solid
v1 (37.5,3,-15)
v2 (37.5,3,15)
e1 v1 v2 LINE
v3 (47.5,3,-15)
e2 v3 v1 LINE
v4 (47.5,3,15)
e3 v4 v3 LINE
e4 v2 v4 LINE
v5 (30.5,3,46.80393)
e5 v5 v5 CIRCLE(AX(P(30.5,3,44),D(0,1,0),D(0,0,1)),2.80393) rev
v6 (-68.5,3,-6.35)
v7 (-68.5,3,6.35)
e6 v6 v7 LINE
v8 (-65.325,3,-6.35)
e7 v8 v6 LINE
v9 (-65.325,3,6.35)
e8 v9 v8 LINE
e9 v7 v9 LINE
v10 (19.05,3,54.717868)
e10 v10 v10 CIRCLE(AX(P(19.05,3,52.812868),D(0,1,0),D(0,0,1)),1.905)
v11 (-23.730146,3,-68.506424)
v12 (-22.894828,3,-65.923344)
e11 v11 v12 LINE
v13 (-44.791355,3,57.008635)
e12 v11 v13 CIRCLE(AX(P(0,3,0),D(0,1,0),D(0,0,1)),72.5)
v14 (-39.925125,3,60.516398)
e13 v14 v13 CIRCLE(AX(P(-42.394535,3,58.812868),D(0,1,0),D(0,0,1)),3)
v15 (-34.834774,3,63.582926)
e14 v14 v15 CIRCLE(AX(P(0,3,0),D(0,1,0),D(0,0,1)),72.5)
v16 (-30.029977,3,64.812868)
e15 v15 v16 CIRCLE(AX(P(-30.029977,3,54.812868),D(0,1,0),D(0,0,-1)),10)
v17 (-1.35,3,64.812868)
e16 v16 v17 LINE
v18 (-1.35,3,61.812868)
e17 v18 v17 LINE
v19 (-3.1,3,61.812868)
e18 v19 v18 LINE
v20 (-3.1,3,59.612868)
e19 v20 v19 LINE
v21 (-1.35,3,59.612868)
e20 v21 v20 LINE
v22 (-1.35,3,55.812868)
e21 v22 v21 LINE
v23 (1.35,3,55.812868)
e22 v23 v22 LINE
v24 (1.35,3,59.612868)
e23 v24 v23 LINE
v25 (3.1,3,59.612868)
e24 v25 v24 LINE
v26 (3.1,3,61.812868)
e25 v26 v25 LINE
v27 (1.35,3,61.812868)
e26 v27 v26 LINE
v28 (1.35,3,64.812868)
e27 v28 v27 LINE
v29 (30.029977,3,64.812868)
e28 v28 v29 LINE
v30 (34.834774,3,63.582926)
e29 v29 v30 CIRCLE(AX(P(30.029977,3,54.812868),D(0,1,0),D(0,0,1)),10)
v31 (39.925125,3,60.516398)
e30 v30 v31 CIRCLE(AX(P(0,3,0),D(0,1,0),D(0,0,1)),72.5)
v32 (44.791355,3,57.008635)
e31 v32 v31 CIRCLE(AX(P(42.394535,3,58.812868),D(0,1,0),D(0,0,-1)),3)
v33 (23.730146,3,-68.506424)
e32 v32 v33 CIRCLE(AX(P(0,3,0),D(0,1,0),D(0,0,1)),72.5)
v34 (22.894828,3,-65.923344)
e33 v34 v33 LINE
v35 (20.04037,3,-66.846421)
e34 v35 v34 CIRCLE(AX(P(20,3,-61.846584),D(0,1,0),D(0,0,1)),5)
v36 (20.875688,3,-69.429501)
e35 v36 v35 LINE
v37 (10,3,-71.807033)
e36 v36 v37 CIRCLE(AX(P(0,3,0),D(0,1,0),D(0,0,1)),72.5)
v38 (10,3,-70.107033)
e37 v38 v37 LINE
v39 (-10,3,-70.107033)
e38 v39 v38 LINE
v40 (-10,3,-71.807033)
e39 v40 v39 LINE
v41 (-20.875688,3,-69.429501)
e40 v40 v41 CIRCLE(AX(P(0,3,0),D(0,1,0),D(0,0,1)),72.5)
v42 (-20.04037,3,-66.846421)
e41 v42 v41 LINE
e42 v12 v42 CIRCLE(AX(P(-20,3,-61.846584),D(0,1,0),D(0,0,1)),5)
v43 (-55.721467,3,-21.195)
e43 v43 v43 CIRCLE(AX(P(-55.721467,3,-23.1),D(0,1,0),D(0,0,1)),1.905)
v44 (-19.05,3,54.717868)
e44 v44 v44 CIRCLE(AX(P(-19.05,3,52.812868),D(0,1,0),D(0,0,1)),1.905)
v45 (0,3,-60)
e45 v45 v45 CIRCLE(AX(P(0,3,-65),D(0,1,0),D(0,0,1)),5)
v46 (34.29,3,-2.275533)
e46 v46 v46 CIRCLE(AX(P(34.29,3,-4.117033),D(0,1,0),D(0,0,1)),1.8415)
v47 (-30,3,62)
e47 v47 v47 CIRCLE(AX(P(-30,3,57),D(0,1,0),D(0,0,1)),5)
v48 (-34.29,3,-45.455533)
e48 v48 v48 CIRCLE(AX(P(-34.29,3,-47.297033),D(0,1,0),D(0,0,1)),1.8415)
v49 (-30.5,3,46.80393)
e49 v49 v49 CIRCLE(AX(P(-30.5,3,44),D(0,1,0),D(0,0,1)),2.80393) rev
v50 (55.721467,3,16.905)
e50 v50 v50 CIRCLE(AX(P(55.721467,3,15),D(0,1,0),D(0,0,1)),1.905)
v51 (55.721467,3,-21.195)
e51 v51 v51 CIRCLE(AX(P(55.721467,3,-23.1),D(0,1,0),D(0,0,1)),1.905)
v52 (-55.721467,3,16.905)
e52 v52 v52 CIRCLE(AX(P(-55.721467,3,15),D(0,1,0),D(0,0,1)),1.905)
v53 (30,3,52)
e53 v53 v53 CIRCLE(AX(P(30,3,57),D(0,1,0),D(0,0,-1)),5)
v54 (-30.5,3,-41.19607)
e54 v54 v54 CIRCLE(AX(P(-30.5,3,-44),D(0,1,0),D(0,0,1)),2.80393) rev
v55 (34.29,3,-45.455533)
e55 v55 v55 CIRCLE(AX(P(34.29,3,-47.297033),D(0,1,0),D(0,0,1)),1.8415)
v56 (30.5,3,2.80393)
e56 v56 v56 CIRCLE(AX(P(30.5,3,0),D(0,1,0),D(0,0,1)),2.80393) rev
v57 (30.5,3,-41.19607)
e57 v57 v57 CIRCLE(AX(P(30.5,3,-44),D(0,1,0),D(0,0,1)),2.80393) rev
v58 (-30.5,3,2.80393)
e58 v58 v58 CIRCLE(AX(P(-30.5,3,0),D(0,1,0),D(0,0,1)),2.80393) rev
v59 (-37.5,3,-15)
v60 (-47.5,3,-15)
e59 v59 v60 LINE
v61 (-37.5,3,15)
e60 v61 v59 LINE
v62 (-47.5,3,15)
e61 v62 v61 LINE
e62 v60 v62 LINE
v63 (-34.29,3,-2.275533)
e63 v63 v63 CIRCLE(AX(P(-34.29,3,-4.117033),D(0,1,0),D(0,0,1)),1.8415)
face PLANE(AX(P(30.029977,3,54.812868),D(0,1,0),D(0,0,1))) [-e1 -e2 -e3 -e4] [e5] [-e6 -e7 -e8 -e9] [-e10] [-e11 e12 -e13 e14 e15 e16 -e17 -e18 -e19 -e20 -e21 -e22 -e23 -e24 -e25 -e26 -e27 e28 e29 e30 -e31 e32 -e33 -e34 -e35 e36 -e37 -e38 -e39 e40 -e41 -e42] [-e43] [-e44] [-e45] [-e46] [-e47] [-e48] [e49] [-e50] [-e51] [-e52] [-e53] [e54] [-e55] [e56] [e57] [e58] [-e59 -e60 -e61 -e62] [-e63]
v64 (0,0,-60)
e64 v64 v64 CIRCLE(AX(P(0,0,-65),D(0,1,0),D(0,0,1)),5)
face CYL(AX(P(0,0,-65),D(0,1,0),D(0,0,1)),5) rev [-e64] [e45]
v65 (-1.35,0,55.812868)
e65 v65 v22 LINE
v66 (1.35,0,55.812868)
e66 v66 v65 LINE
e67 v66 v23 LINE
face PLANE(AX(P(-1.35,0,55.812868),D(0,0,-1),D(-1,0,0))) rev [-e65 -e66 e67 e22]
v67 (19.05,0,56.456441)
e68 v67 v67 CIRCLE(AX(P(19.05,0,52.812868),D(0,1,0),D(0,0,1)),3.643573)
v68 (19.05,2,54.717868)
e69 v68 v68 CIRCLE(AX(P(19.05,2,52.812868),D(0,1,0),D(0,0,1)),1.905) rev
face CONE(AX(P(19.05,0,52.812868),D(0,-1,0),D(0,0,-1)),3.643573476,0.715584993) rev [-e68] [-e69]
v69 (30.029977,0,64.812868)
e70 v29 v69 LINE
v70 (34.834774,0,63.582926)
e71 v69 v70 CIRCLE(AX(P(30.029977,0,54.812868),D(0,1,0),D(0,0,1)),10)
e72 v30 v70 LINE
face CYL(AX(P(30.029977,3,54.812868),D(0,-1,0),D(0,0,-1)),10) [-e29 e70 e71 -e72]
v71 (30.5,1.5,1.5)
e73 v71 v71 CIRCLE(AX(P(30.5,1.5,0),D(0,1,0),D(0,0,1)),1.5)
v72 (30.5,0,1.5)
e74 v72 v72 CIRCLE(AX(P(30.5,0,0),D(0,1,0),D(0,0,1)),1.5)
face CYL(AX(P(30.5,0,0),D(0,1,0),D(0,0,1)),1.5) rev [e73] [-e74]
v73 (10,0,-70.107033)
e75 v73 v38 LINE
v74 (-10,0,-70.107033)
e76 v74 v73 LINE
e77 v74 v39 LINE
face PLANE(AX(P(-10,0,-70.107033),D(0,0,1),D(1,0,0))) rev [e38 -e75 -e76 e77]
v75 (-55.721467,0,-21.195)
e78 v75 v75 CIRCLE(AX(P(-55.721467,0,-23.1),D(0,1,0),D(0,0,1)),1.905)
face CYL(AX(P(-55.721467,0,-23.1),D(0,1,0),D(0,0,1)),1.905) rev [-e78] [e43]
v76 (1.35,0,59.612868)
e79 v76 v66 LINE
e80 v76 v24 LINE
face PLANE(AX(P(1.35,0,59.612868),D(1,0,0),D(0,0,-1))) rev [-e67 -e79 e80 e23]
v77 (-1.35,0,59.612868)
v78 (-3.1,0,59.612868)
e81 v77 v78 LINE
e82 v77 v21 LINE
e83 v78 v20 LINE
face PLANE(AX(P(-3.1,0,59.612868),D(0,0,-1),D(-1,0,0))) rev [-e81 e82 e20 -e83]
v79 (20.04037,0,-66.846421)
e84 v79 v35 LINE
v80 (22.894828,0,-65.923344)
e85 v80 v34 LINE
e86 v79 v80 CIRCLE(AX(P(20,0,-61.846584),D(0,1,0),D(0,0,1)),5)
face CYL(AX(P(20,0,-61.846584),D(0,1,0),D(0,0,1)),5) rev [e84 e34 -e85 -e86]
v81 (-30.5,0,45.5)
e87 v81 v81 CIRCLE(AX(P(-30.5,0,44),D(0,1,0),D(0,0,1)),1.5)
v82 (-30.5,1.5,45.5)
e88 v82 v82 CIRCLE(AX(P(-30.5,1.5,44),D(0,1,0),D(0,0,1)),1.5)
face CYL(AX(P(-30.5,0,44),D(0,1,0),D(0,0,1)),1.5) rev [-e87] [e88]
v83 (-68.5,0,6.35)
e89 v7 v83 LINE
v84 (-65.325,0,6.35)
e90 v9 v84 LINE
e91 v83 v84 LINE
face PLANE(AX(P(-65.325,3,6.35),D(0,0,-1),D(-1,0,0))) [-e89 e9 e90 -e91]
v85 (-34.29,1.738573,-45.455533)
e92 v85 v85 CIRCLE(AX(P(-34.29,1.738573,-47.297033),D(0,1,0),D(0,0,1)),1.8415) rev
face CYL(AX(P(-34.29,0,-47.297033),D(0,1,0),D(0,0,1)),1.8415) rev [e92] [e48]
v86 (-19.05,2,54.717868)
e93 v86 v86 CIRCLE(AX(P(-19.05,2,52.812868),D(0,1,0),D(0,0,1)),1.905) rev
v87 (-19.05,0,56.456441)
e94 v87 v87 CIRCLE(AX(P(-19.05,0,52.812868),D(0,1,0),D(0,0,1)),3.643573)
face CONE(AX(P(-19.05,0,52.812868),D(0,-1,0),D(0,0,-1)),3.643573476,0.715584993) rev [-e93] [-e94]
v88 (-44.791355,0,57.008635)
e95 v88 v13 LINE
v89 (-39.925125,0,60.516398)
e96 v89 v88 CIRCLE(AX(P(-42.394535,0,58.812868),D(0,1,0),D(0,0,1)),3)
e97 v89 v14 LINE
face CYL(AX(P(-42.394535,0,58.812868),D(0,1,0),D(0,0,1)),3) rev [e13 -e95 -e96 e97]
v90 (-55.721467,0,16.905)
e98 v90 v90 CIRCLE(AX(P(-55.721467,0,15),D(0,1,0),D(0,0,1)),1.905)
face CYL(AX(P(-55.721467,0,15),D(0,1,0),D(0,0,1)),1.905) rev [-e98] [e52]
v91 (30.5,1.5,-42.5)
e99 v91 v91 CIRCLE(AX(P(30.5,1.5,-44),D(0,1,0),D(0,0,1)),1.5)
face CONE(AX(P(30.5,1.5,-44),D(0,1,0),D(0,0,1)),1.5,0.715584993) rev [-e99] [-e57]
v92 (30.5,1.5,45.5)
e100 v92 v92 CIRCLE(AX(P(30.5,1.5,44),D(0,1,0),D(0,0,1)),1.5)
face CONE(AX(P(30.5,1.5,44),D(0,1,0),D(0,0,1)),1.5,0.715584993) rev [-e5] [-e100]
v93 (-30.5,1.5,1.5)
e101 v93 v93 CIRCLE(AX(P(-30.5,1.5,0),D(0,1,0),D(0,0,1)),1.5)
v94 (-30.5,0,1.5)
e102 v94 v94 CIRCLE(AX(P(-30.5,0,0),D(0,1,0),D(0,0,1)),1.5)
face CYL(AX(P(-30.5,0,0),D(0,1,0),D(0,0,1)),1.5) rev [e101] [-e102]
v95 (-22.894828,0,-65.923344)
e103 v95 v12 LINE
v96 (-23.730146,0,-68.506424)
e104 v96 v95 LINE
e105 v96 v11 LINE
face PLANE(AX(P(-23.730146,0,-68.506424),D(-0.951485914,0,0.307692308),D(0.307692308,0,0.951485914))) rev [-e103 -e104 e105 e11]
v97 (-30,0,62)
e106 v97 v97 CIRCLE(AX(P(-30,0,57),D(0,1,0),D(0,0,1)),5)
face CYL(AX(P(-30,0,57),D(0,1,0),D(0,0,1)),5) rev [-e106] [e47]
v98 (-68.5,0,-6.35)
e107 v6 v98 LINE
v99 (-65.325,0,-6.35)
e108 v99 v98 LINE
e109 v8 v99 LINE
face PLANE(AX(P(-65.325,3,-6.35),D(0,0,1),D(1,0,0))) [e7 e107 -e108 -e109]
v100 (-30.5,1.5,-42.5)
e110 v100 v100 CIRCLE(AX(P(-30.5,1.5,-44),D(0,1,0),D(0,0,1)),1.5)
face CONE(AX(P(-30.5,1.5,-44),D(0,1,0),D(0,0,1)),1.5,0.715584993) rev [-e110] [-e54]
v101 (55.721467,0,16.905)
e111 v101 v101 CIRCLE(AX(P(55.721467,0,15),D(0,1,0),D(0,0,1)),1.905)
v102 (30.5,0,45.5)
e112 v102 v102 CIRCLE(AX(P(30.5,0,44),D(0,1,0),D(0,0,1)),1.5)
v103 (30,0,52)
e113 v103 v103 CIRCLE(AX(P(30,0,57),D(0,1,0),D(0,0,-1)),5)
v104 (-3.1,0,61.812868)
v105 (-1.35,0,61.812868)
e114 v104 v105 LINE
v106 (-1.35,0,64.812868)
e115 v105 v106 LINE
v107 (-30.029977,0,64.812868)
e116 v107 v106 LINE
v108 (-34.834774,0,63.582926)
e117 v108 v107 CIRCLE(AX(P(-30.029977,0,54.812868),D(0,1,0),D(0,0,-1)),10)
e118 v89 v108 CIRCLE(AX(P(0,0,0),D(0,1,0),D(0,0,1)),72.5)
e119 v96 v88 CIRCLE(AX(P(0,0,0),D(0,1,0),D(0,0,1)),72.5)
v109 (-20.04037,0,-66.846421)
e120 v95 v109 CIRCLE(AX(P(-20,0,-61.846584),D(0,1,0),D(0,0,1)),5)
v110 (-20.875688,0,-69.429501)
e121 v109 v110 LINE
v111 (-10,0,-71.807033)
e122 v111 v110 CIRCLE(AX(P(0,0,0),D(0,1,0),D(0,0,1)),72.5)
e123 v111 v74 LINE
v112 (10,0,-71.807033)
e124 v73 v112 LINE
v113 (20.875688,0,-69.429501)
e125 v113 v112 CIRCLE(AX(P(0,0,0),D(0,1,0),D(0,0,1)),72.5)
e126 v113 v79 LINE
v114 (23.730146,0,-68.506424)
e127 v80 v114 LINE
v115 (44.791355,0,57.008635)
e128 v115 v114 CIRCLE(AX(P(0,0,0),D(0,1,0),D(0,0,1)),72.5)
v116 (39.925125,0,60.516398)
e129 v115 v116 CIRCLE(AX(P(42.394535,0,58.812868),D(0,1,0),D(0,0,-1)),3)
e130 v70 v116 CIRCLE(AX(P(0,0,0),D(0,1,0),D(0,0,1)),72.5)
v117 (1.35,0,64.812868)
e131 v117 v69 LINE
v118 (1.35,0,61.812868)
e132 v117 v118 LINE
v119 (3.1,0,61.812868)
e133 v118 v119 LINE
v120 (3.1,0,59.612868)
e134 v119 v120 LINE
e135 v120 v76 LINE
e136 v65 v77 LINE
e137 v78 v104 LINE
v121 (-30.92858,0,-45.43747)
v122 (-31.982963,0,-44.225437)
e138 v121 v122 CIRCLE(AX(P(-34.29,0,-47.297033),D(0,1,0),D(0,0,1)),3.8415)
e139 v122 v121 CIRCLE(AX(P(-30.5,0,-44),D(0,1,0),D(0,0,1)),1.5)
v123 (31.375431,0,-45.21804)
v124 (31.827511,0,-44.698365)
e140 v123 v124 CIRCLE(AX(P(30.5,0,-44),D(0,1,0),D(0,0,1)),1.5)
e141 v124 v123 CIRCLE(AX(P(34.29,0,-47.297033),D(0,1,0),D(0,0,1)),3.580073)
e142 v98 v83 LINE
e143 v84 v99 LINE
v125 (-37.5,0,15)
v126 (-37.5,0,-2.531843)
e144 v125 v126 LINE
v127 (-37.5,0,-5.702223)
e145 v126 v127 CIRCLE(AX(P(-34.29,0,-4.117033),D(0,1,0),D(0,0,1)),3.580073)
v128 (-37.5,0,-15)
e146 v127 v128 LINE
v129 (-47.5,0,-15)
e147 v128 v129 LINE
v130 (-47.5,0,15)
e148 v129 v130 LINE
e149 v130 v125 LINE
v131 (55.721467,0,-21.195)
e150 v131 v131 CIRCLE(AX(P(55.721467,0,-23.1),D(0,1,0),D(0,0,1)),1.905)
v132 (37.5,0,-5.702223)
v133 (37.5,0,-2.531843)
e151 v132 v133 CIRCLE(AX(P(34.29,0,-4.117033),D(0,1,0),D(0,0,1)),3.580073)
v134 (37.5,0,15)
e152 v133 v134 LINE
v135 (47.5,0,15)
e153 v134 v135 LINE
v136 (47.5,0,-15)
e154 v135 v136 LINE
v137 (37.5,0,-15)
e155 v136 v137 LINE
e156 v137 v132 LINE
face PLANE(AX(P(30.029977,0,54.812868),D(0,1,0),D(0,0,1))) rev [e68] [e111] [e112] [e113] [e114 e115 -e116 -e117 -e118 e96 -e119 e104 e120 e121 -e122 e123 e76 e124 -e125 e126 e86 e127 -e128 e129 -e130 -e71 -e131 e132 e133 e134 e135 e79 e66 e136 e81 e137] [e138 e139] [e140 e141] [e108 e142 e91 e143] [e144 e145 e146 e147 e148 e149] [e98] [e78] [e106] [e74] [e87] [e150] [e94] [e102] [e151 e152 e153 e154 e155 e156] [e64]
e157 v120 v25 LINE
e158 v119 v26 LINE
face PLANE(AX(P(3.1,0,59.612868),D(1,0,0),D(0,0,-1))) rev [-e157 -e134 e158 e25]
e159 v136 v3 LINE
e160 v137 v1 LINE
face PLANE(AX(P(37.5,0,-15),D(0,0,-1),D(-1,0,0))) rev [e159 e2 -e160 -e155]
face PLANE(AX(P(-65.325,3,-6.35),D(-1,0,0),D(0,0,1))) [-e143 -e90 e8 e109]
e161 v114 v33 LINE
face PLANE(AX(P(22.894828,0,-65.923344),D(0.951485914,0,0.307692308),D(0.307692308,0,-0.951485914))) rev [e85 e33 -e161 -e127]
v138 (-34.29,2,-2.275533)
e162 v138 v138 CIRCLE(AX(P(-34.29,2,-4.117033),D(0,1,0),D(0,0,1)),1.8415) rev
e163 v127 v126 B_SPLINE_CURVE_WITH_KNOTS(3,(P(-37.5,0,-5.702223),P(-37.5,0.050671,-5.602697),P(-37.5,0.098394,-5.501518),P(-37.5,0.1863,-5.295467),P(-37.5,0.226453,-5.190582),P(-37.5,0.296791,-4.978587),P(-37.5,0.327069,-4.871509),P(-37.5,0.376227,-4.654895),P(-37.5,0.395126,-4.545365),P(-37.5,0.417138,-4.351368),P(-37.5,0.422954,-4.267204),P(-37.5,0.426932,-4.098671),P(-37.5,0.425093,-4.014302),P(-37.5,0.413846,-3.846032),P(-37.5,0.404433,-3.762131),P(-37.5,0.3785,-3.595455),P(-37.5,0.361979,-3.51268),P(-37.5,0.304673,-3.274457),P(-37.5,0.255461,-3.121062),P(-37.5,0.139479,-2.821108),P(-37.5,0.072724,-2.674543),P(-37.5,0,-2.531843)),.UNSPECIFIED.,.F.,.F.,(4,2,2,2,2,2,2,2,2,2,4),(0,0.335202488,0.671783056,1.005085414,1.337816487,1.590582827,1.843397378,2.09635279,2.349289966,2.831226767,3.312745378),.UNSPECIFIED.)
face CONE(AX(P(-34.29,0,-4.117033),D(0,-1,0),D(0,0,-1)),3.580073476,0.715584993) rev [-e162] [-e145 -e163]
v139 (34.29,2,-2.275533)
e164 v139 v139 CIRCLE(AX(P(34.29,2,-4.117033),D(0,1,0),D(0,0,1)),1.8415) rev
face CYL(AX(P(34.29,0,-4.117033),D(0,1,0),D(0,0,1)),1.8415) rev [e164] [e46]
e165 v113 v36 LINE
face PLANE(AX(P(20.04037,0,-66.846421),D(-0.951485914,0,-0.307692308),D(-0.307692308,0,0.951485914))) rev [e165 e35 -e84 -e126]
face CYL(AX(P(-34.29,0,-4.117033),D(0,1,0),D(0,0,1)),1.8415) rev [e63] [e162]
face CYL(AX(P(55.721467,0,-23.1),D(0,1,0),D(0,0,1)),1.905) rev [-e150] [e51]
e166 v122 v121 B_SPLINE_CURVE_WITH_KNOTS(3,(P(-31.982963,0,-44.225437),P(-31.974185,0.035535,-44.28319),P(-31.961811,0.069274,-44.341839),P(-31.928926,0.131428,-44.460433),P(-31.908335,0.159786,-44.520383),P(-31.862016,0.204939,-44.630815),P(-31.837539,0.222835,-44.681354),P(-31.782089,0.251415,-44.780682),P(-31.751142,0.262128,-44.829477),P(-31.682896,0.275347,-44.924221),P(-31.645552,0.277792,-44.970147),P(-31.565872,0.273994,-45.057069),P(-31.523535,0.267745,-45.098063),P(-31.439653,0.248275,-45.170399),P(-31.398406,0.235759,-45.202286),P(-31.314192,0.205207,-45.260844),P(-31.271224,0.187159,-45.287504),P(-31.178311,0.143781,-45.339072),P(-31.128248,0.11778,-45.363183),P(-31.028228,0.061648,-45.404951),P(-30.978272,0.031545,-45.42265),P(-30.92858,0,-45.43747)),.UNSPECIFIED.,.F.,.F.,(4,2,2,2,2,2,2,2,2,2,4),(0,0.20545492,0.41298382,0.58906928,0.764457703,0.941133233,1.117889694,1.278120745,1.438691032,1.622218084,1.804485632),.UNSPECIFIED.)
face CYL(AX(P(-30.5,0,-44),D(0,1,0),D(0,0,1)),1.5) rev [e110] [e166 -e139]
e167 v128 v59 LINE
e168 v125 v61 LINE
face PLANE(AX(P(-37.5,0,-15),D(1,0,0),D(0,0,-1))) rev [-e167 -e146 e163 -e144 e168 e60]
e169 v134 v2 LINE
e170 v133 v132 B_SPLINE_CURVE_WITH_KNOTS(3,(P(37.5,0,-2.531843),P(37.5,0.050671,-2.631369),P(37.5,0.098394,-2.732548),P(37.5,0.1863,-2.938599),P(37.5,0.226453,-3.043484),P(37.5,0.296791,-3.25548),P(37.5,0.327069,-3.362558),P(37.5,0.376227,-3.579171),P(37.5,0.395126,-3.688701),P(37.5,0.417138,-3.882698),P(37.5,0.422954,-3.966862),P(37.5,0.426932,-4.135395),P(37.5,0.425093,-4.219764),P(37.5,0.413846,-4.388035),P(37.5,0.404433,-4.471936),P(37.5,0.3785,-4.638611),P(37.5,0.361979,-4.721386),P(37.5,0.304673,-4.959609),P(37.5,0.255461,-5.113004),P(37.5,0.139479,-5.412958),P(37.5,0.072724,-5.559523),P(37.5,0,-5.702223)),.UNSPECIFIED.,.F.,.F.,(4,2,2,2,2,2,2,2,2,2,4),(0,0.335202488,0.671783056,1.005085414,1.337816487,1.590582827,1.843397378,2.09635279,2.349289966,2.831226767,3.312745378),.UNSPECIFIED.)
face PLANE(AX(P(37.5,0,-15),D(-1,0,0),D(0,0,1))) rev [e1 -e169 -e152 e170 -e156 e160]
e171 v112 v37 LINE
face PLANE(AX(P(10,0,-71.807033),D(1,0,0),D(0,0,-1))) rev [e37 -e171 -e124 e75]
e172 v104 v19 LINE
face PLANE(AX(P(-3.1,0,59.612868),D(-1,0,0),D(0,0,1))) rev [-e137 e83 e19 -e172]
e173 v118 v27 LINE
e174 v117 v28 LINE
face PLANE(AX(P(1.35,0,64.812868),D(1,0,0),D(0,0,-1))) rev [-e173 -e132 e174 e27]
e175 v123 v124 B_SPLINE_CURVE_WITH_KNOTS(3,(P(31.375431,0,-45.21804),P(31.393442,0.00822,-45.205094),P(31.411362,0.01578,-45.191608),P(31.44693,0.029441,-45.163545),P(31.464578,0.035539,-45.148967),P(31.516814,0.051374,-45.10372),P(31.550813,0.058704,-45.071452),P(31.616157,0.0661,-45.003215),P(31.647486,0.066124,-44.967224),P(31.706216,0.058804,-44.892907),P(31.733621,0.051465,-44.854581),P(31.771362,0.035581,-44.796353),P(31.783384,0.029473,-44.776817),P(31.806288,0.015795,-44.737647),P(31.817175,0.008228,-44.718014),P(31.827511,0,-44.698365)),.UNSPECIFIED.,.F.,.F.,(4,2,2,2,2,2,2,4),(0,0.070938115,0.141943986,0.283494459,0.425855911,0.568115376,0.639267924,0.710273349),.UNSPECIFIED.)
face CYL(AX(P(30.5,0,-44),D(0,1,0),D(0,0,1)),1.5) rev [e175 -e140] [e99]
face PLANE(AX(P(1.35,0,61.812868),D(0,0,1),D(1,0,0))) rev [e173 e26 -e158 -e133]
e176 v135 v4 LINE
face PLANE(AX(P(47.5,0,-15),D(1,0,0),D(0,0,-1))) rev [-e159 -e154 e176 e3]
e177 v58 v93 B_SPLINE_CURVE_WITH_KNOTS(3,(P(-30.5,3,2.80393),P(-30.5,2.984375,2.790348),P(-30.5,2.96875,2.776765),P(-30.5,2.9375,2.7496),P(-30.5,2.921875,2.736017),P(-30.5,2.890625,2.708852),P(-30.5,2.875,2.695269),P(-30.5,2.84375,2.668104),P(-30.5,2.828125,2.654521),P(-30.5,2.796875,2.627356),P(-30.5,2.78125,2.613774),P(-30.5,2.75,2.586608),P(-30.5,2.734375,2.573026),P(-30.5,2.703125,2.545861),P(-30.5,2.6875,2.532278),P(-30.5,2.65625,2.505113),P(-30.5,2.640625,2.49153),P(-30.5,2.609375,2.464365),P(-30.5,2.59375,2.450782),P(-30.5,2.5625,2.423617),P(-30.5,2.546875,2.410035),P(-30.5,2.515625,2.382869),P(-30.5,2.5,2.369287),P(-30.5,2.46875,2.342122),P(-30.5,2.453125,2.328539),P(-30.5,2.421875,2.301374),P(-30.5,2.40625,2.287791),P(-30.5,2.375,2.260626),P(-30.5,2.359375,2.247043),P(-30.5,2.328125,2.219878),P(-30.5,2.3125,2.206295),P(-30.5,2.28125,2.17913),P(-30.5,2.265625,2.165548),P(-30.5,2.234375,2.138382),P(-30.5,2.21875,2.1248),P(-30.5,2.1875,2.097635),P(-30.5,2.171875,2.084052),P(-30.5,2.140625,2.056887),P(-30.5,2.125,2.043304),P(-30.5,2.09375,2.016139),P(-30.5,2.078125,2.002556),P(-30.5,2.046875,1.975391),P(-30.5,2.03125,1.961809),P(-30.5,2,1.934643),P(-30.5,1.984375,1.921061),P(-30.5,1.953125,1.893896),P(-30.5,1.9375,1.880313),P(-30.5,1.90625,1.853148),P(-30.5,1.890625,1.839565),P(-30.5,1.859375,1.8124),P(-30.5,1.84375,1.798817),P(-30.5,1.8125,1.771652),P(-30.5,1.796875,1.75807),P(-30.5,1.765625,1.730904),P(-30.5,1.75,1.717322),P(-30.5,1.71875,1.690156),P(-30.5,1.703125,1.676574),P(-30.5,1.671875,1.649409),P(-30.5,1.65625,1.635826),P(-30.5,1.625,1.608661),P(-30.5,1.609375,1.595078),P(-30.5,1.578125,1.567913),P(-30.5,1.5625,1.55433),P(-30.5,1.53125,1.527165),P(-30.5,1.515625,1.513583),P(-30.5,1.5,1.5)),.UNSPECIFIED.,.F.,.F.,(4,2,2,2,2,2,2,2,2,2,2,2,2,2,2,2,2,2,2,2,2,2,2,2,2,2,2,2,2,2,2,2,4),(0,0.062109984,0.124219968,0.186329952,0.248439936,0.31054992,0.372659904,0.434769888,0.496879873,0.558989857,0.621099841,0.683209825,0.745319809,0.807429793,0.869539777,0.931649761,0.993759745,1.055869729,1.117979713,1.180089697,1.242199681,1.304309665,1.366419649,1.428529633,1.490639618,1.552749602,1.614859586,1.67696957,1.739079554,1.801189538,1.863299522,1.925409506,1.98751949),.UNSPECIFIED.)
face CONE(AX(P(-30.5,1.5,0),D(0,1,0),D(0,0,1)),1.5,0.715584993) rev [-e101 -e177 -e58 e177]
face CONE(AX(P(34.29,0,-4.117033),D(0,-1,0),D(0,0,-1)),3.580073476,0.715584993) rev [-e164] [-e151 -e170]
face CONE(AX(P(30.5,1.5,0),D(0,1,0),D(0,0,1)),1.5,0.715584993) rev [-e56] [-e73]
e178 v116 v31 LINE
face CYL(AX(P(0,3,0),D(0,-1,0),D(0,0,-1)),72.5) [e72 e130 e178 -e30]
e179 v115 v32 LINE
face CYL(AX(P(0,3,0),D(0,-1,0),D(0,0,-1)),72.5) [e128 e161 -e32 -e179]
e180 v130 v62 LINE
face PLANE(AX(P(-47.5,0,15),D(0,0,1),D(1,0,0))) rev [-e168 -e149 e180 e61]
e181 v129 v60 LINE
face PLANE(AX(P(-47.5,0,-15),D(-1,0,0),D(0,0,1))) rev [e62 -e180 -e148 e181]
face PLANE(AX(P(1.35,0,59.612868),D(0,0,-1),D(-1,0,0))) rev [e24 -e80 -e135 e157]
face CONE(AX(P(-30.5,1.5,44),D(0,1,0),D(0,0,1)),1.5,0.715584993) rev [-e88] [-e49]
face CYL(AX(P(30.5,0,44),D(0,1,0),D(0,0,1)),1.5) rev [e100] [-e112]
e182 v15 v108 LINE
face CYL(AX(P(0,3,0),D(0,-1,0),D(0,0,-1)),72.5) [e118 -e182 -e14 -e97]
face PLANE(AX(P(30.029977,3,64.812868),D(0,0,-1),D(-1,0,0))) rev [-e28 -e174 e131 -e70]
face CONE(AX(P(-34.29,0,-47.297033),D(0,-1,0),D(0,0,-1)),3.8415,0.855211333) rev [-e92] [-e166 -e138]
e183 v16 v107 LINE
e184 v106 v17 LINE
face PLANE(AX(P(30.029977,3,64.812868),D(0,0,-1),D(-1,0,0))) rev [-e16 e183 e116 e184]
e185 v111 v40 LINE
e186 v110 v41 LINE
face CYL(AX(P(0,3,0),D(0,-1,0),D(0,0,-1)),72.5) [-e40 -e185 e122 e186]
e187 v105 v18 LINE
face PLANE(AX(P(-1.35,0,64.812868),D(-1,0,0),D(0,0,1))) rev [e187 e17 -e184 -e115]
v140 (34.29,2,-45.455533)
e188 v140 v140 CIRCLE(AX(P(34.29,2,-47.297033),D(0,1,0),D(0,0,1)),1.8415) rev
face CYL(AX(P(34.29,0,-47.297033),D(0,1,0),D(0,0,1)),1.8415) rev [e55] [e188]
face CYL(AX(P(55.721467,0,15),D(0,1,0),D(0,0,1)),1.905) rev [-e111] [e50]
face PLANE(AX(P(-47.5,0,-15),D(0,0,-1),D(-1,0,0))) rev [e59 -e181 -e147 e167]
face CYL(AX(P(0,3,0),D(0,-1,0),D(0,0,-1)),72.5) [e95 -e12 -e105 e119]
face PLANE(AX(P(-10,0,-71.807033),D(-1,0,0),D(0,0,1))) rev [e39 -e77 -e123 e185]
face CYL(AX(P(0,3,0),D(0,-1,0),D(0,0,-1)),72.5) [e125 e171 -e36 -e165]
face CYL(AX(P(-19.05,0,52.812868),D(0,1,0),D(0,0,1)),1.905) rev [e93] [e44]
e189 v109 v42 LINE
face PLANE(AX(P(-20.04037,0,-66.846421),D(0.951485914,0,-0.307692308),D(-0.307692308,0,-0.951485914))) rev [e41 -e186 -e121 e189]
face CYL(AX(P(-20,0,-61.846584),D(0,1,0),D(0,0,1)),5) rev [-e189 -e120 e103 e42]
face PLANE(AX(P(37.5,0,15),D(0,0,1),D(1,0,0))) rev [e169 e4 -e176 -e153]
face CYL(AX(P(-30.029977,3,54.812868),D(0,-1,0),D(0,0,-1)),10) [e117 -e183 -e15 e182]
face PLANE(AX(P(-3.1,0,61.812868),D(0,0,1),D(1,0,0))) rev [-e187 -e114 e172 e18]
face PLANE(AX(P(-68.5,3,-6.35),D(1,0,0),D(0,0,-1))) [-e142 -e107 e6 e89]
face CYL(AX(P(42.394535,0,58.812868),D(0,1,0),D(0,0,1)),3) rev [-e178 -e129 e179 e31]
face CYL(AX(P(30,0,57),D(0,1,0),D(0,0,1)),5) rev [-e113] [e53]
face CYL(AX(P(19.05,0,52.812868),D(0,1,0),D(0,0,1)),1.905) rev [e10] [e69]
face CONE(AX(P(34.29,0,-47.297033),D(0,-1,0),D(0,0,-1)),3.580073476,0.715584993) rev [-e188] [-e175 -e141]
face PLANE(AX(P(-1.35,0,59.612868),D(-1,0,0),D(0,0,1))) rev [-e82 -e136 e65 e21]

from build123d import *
from OCP.BRepFilletAPI import BRepFilletAPI_MakeChamfer

# Parameters (mm, degrees)
SKETCH1_W           = 3.175
SKETCH1_H           = 12.7
BOSS_EXTRUDE1_DEPTH = 3
SKETCH2_R           = 1.5
CUT_EXTRUDE1_DEPTH  = 103.574363269
CHAMFER1_SIZE       = 1.5
CHAMFER1_SIZE2      = 1.303930107
CUT_EXTRUDE2_DEPTH  = 103.574363269
SKETCH4_W           = 20
SKETCH4_H           = 1.7
CUT_EXTRUDE3_DEPTH  = 103.574363269
SKETCH5_R           = 5
CUT_EXTRUDE4_DEPTH  = 103.085748271
SKETCH6_R           = 1.8415
CUT_EXTRUDE5_DEPTH  = 103.085748271
SKETCH8_R           = 1.905
SKETCH8_W           = 10
SKETCH8_H           = 30
CUT_EXTRUDE7_DEPTH  = 103.085748271
CHAMFER2_SIZE       = 2
CHAMFER2_SIZE_2     = 1.738573476


with BuildPart() as part:
    # Sketch1 → Boss-Extrude1 (new body)
    with BuildSketch(Plane(origin=(0, 0, 0), x_dir=(1, 0, 0), z_dir=(0, 1, 0))):
        with BuildLine():
            Line((30.029977361, -64.812867647), (-30.029977361, -64.812867647))
            ThreePointArc((-30.029977361, -64.812867647), (-32.509837414, -64.500503794), (-34.834773739, -63.582926471))
            ThreePointArc((-34.834773739, -63.582926471), (0, 72.5), (34.834773739, -63.582926471))
            ThreePointArc((34.834773739, -63.582926471), (32.509837414, -64.500503794), (30.029977361, -64.812867647))
        make_face()
        with Locations((-66.9125, 0)):
            Rectangle(SKETCH1_W, SKETCH1_H, mode=Mode.SUBTRACT)
    extrude(amount=BOSS_EXTRUDE1_DEPTH)

    # Sketch2 → Cut-Extrude1 (cut, through all)
    with BuildSketch(Plane(origin=(0, 3, 0), x_dir=(1, 0, 0), z_dir=(0, 1, 0))):
        with Locations(Location((-30.5, 44, 0), (0, 0, 270))):
            Circle(SKETCH2_R)
        with Locations(Location((30.5, 44, 0), (0, 0, 270))):
            Circle(SKETCH2_R)
        with Locations(Location((30.5, 0, 0), (0, 0, 270))):
            Circle(SKETCH2_R)
        with Locations(Location((30.5, -44, 0), (0, 0, 270))):
            Circle(SKETCH2_R)
        with Locations(Location((-30.5, -44, 0), (0, 0, 270))):
            Circle(SKETCH2_R)
        with Locations(Location((-30.5, 0, 0), (0, 0, 270))):
            Circle(SKETCH2_R)
    extrude(amount=-CUT_EXTRUDE1_DEPTH, mode=Mode.SUBTRACT)

    # Chamfer1: one chamfer whose edges measure the first distance from different faces: ONE call of the kernel's chamfer builder (chamfer() names one face for all edges)
    chamfer1_edges_1 = [part.edges().sort_by_distance(p)[0] for p in [
        (-30.5, 3, -45.5),
    ]]
    chamfer1_side_1 = [part.faces().sort_by_distance(p)[0] for p in [
        (-30.5, 1.5, -45.5),
    ]]
    chamfer1_edges_2 = [part.edges().sort_by_distance(p)[0] for p in [
        (-30.5, 3, -1.5),
    ]]
    chamfer1_side_2 = [part.faces().sort_by_distance(p)[0] for p in [
        (-30.5, 1.5, -1.5),
    ]]
    chamfer1_edges_3 = [part.edges().sort_by_distance(p)[0] for p in [
        (-30.5, 3, 42.5),
    ]]
    chamfer1_side_3 = [part.faces().sort_by_distance(p)[0] for p in [
        (-30.5, 1.5, 42.5),
    ]]
    chamfer1_edges_4 = [part.edges().sort_by_distance(p)[0] for p in [
        (30.5, 3, 42.5),
    ]]
    chamfer1_side_4 = [part.faces().sort_by_distance(p)[0] for p in [
        (30.5, 1.5, 42.5),
    ]]
    chamfer1_edges_5 = [part.edges().sort_by_distance(p)[0] for p in [
        (30.5, 3, -1.5),
    ]]
    chamfer1_side_5 = [part.faces().sort_by_distance(p)[0] for p in [
        (30.5, 1.5, -1.5),
    ]]
    chamfer1_edges_6 = [part.edges().sort_by_distance(p)[0] for p in [
        (30.5, 3, -45.5),
    ]]
    chamfer1_side_6 = [part.faces().sort_by_distance(p)[0] for p in [
        (30.5, 1.5, -45.5),
    ]]
    chamfer1 = BRepFilletAPI_MakeChamfer(part.part.solid().wrapped)
    for e in chamfer1_edges_1:
        chamfer1.Add(CHAMFER1_SIZE, CHAMFER1_SIZE2, e.wrapped, chamfer1_side_1[0].wrapped)  # the first distance lies on this face
    for e in chamfer1_edges_2:
        chamfer1.Add(CHAMFER1_SIZE, CHAMFER1_SIZE2, e.wrapped, chamfer1_side_2[0].wrapped)  # the first distance lies on this face
    for e in chamfer1_edges_3:
        chamfer1.Add(CHAMFER1_SIZE, CHAMFER1_SIZE2, e.wrapped, chamfer1_side_3[0].wrapped)  # the first distance lies on this face
    for e in chamfer1_edges_4:
        chamfer1.Add(CHAMFER1_SIZE, CHAMFER1_SIZE2, e.wrapped, chamfer1_side_4[0].wrapped)  # the first distance lies on this face
    for e in chamfer1_edges_5:
        chamfer1.Add(CHAMFER1_SIZE, CHAMFER1_SIZE2, e.wrapped, chamfer1_side_5[0].wrapped)  # the first distance lies on this face
    for e in chamfer1_edges_6:
        chamfer1.Add(CHAMFER1_SIZE, CHAMFER1_SIZE2, e.wrapped, chamfer1_side_6[0].wrapped)  # the first distance lies on this face
    add(Compound.cast(chamfer1.Shape()), mode=Mode.REPLACE)

    # Sketch3 → Cut-Extrude2 (cut, through all)
    with BuildSketch(Plane(origin=(0, 3, 0), x_dir=(1, 0, 0), z_dir=(0, 1, 0))):
        Polygon((1.35, -61.812867647), (3.1, -61.812867647), (3.1, -59.612867647), (1.35, -59.612867647), (1.35, -55.812867647), (-1.35, -55.812867647), (-1.35, -59.612867647), (-3.1, -59.612867647), (-3.1, -61.812867647), (-1.35, -61.812867647), (-1.35, -64.812867647), (1.35, -64.812867647), align=None)
    extrude(amount=-CUT_EXTRUDE2_DEPTH, mode=Mode.SUBTRACT)

    # Sketch4 → Cut-Extrude3 (cut, through all)
    with BuildSketch(Plane(origin=(0, 3, 0), x_dir=(1, 0, 0), z_dir=(0, 1, 0))):
        with Locations((0, 70.957033082)):
            Rectangle(SKETCH4_W, SKETCH4_H)
    extrude(amount=-CUT_EXTRUDE3_DEPTH, mode=Mode.SUBTRACT)


with BuildPart() as body_2:
    # of the pieces the cut leaves, the one that is kept (cut_extrude3_keep)
    add(part.part.solids().sort_by_distance((-30.029977361, 3, 64.812867647))[0])

    # Sketch5 → Cut-Extrude4 (cut, through all)
    with BuildSketch(Plane(origin=(0, 3, 0), x_dir=(1, 0, 0), z_dir=(0, 1, 0))):
        with Locations(Location((0, 65, 0), (0, 0, 270))):
            Circle(SKETCH5_R)
        with Locations(Location((30, -57, 0), (0, 0, 90))):
            Circle(SKETCH5_R)
        with Locations(Location((-30, -57, 0), (0, 0, 270))):
            Circle(SKETCH5_R)
    extrude(amount=-CUT_EXTRUDE4_DEPTH, mode=Mode.SUBTRACT)

    # Sketch6 → Cut-Extrude5 (cut, through all)
    with BuildSketch(Plane(origin=(0, 3, 0), x_dir=(1, 0, 0), z_dir=(0, 1, 0))):
        with Locations(Location((-34.29, 47.297033082, 0), (0, 0, 270))):
            Circle(SKETCH6_R)
        with Locations(Location((-34.29, 4.117033082, 0), (0, 0, 270))):
            Circle(SKETCH6_R)
        with Locations(Location((34.29, 4.117033082, 0), (0, 0, 270))):
            Circle(SKETCH6_R)
        with Locations(Location((34.29, 47.297033082, 0), (0, 0, 270))):
            Circle(SKETCH6_R)
    extrude(amount=-CUT_EXTRUDE5_DEPTH, mode=Mode.SUBTRACT)

    # Sketch8 → Cut-Extrude7 (cut, through all)
    with BuildSketch(Plane(origin=(0, 3, 0), x_dir=(1, 0, 0), z_dir=(0, 1, 0))):
        with Locations(Location((55.721466806, -15, 0), (0, 0, 270))):
            Circle(SKETCH8_R)
        with Locations(Location((55.721466806, 23.1, 0), (0, 0, 270))):
            Circle(SKETCH8_R)
        with Locations(Location((19.05, -52.812867647, 0), (0, 0, 270))):
            Circle(SKETCH8_R)
        with Locations(Location((-19.05, -52.812867647, 0), (0, 0, 270))):
            Circle(SKETCH8_R)
        with Locations(Location((-55.721466806, 23.1, 0), (0, 0, 270))):
            Circle(SKETCH8_R)
        with Locations(Location((-55.721466806, -15, 0), (0, 0, 270))):
            Circle(SKETCH8_R)
        with Locations((-42.5, 0)):
            Rectangle(SKETCH8_W, SKETCH8_H)
        with Locations((42.5, 0)):
            Rectangle(SKETCH8_W, SKETCH8_H)
        with BuildLine():
            Line((-23.730146131, 68.506424258), (-22.894827642, 65.923344486))
            ThreePointArc((-22.894827642, 65.923344486), (-18.461538462, 57.089154816), (-20.040369901, 66.846421409))
            Line((-20.040369901, 66.846421409), (-20.87568839, 69.429501181))
            ThreePointArc((-20.87568839, 69.429501181), (-22.764455722, 70.39519159), (-23.730146131, 68.506424258))
        make_face()
        with BuildLine():
            Line((20.040369901, 66.846421409), (20.87568839, 69.429501181))
            ThreePointArc((20.87568839, 69.429501181), (22.764455722, 70.39519159), (23.730146131, 68.506424258))
            Line((23.730146131, 68.506424258), (22.894827642, 65.923344486))
            ThreePointArc((22.894827642, 65.923344486), (18.461538462, 57.089154816), (20.040369901, 66.846421409))
        make_face()
        with BuildLine():
            ThreePointArc((39.925125077, -60.516397675), (40.640278394, -56.379231744), (44.791355024, -57.008635443))
            ThreePointArc((44.791355024, -57.008635443), (42.394535015, -58.812867647), (39.925125077, -60.516397675))
        make_face()
        with BuildLine():
            ThreePointArc((-39.925125077, -60.516397675), (-40.640278394, -56.379231744), (-44.791355024, -57.008635443))
            ThreePointArc((-44.791355024, -57.008635443), (-42.394535015, -58.812867647), (-39.925125077, -60.516397675))
        make_face()
    extrude(amount=-CUT_EXTRUDE7_DEPTH, mode=Mode.SUBTRACT)

    # Chamfer2
    # the kernel refuses this chamfer: 2, 1.738573476 mm, written as the material it takes off along each edge
    with BuildSketch(Plane(origin=(-19.05, 0, 52.812867647), x_dir=(0, 0, 1), z_dir=(-1, 0, 0))) as chamfer2_piece_1:
        Polygon((1.905, CHAMFER2_SIZE), (1.905 + CHAMFER2_SIZE_2, 0), (1.905, 0), align=None)
    revolve(axis=Axis((-19.05, 0, 52.812867647), (0, 1, 0)), mode=Mode.SUBTRACT)
    with BuildSketch(Plane(origin=(19.05, 0, 52.812867647), x_dir=(0, 0, 1), z_dir=(-1, 0, 0))) as chamfer2_piece_2:
        Polygon((1.905, CHAMFER2_SIZE), (1.905 + CHAMFER2_SIZE_2, 0), (1.905, 0), align=None)
    revolve(axis=Axis((19.05, 0, 52.812867647), (0, 1, 0)), mode=Mode.SUBTRACT)
    with BuildSketch(Plane(origin=(-34.29, 0, -47.297033082), x_dir=(0, 0, 1), z_dir=(-1, 0, 0))) as chamfer2_piece_3:
        Polygon((1.8415, CHAMFER2_SIZE_2), (1.8415 + CHAMFER2_SIZE, 0), (1.8415, 0), align=None)
    revolve(axis=Axis((-34.29, 0, -47.297033082), (0, 1, 0)), mode=Mode.SUBTRACT)
    with BuildSketch(Plane(origin=(-34.29, 0, -4.117033082), x_dir=(0, 0, 1), z_dir=(-1, 0, 0))) as chamfer2_piece_4:
        Polygon((1.8415, CHAMFER2_SIZE), (1.8415 + CHAMFER2_SIZE_2, 0), (1.8415, 0), align=None)
    revolve(axis=Axis((-34.29, 0, -4.117033082), (0, 1, 0)), mode=Mode.SUBTRACT)
    with BuildSketch(Plane(origin=(34.29, 0, -4.117033082), x_dir=(0, 0, 1), z_dir=(-1, 0, 0))) as chamfer2_piece_5:
        Polygon((1.8415, CHAMFER2_SIZE), (1.8415 + CHAMFER2_SIZE_2, 0), (1.8415, 0), align=None)
    revolve(axis=Axis((34.29, 0, -4.117033082), (0, 1, 0)), mode=Mode.SUBTRACT)
    with BuildSketch(Plane(origin=(34.29, 0, -47.297033082), x_dir=(0, 0, 1), z_dir=(-1, 0, 0))) as chamfer2_piece_6:
        Polygon((1.8415, CHAMFER2_SIZE), (1.8415 + CHAMFER2_SIZE_2, 0), (1.8415, 0), align=None)
    revolve(axis=Axis((34.29, 0, -47.297033082), (0, 1, 0)), mode=Mode.SUBTRACT)


solid = body_2.part
